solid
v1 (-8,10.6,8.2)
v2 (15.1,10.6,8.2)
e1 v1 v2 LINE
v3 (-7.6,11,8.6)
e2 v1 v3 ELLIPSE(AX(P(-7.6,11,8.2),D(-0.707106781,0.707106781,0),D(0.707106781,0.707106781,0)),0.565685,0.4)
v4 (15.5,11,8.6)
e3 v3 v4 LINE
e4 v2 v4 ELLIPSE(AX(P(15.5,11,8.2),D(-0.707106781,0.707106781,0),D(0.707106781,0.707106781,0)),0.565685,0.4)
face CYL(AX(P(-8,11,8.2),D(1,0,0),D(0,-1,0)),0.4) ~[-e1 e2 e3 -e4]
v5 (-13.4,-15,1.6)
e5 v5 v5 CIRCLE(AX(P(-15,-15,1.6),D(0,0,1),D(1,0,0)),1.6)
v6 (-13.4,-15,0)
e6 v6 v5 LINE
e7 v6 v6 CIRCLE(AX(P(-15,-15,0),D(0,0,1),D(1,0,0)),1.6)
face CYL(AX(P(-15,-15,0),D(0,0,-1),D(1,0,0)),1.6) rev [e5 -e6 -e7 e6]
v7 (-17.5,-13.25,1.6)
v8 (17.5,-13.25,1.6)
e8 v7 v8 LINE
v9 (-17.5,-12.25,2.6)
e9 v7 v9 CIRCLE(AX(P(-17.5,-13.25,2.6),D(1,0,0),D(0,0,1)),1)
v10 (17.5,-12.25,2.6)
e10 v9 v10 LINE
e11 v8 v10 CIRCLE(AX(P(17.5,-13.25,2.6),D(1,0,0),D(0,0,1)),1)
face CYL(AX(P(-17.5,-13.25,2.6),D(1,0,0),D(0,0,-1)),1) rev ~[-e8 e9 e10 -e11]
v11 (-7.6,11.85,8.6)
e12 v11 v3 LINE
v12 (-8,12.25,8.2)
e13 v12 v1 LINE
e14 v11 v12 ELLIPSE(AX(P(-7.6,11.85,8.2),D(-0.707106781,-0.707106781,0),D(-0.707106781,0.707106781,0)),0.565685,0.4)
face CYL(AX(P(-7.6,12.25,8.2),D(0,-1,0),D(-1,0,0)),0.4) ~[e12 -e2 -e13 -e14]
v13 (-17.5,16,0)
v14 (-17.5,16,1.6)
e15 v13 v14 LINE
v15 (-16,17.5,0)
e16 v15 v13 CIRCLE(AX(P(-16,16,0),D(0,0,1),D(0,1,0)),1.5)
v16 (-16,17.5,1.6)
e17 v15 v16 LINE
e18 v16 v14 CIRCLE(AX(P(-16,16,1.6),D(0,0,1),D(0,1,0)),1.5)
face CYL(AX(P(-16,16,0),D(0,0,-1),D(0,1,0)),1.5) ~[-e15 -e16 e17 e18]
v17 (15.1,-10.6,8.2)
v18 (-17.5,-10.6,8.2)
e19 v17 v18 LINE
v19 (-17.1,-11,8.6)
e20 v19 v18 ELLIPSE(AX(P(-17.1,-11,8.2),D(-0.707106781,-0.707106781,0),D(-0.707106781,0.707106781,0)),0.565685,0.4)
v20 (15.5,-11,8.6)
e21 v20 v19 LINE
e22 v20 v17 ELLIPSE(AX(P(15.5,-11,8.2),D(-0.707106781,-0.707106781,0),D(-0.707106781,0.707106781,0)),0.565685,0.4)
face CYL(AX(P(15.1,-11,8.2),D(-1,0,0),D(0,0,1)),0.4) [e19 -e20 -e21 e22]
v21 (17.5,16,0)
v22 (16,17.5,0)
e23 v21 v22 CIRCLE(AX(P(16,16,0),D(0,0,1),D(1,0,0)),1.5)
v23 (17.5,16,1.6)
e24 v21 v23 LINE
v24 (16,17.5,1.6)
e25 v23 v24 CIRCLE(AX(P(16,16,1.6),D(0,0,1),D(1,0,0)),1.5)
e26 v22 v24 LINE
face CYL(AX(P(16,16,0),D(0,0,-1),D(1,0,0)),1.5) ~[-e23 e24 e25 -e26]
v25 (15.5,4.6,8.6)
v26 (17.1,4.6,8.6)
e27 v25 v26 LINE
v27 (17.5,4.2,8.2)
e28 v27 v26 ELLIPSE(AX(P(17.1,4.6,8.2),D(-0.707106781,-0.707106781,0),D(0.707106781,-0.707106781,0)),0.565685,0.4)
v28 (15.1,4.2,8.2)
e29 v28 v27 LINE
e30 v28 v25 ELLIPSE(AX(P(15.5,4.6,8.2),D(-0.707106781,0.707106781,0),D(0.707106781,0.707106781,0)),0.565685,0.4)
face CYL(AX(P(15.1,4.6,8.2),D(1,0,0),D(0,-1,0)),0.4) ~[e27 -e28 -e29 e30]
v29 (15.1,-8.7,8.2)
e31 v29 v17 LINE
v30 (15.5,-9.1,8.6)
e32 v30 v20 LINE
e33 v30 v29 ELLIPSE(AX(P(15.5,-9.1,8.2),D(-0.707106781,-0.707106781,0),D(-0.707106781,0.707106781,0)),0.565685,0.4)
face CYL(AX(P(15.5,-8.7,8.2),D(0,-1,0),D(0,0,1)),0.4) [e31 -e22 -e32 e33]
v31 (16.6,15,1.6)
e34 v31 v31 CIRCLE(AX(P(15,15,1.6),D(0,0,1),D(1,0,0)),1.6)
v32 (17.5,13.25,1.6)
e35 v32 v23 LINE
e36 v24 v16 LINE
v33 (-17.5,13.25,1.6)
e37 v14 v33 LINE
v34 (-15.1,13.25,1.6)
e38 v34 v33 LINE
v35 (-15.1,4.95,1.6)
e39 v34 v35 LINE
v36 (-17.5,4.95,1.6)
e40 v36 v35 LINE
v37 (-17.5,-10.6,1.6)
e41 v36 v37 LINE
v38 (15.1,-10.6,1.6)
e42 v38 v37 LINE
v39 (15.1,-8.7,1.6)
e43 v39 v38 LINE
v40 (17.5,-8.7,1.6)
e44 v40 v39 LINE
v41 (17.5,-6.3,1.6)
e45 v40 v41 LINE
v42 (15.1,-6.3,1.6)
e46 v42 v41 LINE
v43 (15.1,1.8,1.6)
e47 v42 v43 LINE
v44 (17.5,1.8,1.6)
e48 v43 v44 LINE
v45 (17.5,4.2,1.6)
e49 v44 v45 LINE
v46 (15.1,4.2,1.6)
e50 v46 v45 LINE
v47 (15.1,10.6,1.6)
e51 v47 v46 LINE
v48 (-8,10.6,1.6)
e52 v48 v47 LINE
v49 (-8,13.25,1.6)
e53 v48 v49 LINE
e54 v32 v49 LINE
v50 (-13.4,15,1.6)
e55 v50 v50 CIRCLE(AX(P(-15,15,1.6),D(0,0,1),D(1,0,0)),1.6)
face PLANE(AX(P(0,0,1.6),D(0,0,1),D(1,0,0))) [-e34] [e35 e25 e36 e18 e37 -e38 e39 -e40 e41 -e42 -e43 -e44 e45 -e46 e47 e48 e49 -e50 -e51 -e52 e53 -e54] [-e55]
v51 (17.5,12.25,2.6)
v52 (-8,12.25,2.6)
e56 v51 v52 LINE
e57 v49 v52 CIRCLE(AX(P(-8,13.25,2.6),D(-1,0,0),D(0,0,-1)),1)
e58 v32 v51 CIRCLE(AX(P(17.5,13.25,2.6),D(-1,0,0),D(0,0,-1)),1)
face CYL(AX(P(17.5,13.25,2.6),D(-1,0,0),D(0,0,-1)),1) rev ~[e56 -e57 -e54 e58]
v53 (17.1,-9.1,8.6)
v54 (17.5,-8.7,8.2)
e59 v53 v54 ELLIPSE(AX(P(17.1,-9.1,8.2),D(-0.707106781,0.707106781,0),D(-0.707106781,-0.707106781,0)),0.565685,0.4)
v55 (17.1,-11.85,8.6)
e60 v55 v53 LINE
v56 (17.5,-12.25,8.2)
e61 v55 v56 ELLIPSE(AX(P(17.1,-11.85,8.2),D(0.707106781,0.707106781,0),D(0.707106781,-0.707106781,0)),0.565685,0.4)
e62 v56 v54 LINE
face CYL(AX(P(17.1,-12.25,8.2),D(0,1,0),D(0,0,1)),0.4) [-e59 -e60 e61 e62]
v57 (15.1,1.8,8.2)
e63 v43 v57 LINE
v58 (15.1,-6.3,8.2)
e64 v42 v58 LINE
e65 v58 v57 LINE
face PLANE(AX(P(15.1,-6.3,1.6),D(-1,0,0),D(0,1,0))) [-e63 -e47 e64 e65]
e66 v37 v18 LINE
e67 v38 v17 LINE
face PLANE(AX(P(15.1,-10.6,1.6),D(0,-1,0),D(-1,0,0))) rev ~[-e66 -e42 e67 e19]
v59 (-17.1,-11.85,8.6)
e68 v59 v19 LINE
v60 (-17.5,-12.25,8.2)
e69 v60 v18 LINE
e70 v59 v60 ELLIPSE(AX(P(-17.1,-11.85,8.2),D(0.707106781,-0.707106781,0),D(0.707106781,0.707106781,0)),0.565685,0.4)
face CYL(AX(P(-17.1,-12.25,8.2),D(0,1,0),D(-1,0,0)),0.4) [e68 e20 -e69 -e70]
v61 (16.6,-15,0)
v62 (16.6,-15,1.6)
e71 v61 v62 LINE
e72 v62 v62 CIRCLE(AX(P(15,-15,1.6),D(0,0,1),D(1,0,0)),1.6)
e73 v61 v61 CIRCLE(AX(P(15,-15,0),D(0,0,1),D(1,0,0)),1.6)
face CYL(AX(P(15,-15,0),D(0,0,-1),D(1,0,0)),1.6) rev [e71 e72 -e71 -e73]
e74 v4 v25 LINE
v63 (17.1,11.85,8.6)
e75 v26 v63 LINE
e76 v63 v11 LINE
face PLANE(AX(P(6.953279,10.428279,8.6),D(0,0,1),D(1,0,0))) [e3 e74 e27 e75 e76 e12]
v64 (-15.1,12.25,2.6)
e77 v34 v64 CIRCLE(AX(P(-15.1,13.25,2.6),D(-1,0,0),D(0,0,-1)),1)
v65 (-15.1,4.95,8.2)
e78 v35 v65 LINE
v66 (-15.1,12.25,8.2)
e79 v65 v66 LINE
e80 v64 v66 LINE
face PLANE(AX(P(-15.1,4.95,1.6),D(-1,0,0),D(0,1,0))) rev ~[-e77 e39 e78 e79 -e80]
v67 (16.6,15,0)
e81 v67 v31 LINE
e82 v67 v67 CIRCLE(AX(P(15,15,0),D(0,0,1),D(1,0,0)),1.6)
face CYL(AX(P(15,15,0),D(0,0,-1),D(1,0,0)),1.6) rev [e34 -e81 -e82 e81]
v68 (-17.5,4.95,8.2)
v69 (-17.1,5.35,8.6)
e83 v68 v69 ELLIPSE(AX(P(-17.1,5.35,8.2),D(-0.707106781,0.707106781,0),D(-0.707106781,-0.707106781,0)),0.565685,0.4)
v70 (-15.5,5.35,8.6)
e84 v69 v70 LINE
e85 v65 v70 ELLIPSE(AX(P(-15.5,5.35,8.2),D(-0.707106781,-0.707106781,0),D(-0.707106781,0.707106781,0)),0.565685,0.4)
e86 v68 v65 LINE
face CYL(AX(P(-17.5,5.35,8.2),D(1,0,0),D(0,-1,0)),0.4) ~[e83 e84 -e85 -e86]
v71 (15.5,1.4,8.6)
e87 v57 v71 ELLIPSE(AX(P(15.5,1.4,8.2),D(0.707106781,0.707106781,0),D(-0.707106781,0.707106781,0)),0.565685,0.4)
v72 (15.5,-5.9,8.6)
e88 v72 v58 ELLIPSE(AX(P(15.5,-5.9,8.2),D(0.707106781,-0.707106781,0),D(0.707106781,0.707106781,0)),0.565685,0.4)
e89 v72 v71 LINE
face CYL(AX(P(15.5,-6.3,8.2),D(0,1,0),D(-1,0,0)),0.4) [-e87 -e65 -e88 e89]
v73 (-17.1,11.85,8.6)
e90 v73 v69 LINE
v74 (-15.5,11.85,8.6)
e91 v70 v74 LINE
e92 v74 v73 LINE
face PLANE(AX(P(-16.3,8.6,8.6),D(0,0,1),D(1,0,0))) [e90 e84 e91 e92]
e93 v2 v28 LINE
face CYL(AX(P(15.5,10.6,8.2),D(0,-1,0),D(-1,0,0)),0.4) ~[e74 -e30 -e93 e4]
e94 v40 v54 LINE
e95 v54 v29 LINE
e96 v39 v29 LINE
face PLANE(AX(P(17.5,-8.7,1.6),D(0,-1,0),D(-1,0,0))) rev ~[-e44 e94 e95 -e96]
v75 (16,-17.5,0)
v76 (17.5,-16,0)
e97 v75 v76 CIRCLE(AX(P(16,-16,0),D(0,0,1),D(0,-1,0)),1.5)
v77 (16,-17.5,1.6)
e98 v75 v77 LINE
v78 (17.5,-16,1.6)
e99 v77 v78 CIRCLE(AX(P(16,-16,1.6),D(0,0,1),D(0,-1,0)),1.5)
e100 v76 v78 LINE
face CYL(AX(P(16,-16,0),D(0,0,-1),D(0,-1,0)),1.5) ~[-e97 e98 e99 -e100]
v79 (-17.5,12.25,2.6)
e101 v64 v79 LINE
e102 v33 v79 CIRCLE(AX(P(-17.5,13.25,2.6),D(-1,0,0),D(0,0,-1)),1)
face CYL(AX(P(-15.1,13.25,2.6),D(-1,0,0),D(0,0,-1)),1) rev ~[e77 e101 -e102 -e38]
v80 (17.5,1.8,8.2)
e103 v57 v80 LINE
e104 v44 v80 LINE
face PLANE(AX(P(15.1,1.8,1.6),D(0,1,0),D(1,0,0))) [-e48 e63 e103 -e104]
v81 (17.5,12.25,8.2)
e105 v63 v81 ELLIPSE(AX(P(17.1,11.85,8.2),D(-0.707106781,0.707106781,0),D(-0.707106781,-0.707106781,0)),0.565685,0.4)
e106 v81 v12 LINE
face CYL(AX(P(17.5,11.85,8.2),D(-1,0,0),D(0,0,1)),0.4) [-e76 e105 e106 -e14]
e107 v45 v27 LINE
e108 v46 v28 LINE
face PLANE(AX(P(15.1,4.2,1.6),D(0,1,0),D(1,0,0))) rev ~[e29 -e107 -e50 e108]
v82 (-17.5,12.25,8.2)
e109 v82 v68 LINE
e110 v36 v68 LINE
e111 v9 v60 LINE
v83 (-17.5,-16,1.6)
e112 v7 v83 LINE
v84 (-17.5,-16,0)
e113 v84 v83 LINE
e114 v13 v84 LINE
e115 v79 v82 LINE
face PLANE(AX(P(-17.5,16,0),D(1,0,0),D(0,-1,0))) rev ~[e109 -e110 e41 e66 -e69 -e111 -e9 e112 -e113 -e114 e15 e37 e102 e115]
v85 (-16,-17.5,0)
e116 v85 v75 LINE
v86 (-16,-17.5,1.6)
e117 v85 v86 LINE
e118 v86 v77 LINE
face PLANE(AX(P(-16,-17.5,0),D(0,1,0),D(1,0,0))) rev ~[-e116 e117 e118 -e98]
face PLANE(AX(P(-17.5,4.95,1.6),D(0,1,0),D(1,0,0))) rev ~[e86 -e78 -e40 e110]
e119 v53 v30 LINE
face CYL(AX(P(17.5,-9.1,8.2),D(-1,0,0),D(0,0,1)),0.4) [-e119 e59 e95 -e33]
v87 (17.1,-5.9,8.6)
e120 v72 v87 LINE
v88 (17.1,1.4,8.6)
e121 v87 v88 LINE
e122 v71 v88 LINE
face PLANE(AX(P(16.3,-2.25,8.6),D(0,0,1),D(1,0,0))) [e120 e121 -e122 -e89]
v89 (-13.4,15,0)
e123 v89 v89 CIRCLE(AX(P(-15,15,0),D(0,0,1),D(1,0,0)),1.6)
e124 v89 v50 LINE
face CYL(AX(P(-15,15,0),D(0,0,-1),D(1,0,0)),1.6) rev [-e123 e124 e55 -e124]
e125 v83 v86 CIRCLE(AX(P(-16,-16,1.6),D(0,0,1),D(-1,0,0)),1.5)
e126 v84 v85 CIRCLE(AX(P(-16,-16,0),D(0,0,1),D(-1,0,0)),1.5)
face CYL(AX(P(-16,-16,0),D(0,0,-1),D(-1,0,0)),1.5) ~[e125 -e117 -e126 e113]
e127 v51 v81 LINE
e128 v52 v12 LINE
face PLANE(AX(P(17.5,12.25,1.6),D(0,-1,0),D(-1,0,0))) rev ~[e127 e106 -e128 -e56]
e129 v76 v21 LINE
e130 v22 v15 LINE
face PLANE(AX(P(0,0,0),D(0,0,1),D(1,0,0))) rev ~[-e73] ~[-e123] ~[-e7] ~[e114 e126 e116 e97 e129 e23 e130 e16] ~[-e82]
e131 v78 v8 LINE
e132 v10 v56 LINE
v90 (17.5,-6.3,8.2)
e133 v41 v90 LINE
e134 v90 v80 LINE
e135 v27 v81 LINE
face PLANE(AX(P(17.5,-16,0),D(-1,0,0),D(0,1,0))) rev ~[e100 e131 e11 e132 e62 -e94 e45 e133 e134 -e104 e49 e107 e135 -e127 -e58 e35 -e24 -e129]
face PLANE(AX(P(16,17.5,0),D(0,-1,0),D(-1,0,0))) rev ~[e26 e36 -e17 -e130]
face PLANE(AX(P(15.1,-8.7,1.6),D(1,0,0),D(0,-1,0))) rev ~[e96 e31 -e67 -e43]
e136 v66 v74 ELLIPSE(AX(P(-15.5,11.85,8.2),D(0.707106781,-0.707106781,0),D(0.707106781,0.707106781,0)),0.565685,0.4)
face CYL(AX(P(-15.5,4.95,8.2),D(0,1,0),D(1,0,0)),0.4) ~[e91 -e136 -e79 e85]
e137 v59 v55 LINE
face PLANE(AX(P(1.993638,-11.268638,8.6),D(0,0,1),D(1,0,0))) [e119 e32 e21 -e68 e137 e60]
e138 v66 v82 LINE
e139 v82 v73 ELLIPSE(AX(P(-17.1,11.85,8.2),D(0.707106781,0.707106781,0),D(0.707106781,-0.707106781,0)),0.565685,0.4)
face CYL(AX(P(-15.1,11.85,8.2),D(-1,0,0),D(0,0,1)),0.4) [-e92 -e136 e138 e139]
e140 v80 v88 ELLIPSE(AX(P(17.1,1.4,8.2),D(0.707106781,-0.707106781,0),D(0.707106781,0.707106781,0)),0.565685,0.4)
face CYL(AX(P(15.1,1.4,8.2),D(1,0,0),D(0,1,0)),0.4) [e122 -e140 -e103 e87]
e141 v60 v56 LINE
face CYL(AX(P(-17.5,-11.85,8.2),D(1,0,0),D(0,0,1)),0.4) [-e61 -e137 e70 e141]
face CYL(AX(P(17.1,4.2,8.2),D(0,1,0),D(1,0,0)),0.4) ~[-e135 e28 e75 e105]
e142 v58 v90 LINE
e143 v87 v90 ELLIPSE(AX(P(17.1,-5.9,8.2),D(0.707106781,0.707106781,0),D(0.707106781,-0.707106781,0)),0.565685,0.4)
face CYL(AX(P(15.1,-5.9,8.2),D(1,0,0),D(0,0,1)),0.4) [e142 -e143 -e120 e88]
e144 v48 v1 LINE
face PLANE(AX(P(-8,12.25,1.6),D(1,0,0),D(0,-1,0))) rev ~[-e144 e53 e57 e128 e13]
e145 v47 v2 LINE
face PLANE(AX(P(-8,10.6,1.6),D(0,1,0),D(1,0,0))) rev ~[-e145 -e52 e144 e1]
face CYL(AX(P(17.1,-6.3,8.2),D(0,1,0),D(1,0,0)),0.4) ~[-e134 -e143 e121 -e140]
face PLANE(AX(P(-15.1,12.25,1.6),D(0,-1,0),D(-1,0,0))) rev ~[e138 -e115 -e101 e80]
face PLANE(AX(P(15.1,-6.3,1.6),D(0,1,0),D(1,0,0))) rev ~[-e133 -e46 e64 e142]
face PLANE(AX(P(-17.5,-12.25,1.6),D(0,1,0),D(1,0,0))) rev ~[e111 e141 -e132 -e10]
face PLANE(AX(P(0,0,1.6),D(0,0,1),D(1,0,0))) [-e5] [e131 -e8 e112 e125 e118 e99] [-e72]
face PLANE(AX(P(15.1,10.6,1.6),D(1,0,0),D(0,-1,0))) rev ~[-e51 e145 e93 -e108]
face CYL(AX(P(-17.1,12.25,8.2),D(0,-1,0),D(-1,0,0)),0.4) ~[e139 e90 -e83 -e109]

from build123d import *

# Parameters (mm, degrees)
F0_R     = 1.6
F1_DEPTH = 1.6
F2_W     = 2.4
F2_H     = 8.1
F2_H_2   = 1.65
F3_DEPTH = 7
F4_R     = 1
F5_R     = 0.4


with BuildPart() as f1:
    # F0 (on Top) → F1 (new body)
    with BuildSketch(Plane.XY):
        with BuildLine():
            ThreePointArc((-17.5, -16), (-17.0606601718, -17.0606601718), (-16, -17.5))
            Line((-16, -17.5), (16, -17.5))
            ThreePointArc((16, -17.5), (17.0606601718, -17.0606601718), (17.5, -16))
            Line((17.5, -16), (17.5, 16))
            ThreePointArc((17.5, 16), (17.0606601718, 17.0606601718), (16, 17.5))
            Line((16, 17.5), (-16, 17.5))
            ThreePointArc((-16, 17.5), (-17.0606601718, 17.0606601718), (-17.5, 16))
            Line((-17.5, 16), (-17.5, -16))
        make_face()
        with Locations((-15, -15)):
            Circle(F0_R, mode=Mode.SUBTRACT)
        with Locations((15, -15)):
            Circle(F0_R, mode=Mode.SUBTRACT)
        with Locations((-15, 15)):
            Circle(F0_R, mode=Mode.SUBTRACT)
        with Locations((15, 15)):
            Circle(F0_R, mode=Mode.SUBTRACT)
    extrude(amount=F1_DEPTH)

    # F2 (on face) → F3 (join)
    with BuildSketch(Plane.XY.offset(1.6)):
        Polygon((15.1, -10.6), (-15.1, -10.6), (-15.1, -12.25), (17.5, -12.25), (17.5, -8.7), (15.1, -8.7), align=None)
        with Locations((16.3, -2.25)):
            Rectangle(F2_W, F2_H)
        Polygon((-8, 12.25), (-8, 10.6), (15.1, 10.6), (15.1, 4.2), (17.5, 4.2), (17.5, 12.25), align=None)
        Polygon((-17.5, 4.95), (-15.1, 4.95), (-15.1, 10.6), (-15.1, 12.25), (-17.5, 12.25), align=None)
        with Locations((-16.3, -11.425)):
            Rectangle(F2_W, F2_H_2)
    extrude(amount=F3_DEPTH)

    # F4
    f4_edges = [f1.edges().sort_by_distance(p)[0] for p in [
        (0, -12.25, 1.6),
        (4.75, 12.25, 1.6),
        (-16.3, 12.25, 1.6),
    ]]
    fillet(f4_edges, radius=F4_R)

    # F5
    f5_edges = [f1.edges().sort_by_distance(p)[0] for p in [
        (4.75, 12.25, 8.6),
        (3.55, 10.6, 8.6),
        (-15.1, 8.6, 8.6),
        (-17.5, 8.6, 8.6),
        (-16.3, 12.25, 8.6),
        (-8, 11.425, 8.6),
        (-16.3, 4.95, 8.6),
        (-1.2, -10.6, 8.6),
        (0, -12.25, 8.6),
        (16.3, -8.7, 8.6),
        (17.5, -10.475, 8.6),
        (15.1, -9.65, 8.6),
        (16.3, -6.3, 8.6),
        (15.1, -2.25, 8.6),
        (17.5, -2.25, 8.6),
        (16.3, 1.8, 8.6),
        (16.3, 4.2, 8.6),
        (15.1, 7.4, 8.6),
        (17.5, 8.225, 8.6),
        (-17.5, -11.425, 8.6),
    ]]
    fillet(f5_edges, radius=F5_R)


solid = f1.part
